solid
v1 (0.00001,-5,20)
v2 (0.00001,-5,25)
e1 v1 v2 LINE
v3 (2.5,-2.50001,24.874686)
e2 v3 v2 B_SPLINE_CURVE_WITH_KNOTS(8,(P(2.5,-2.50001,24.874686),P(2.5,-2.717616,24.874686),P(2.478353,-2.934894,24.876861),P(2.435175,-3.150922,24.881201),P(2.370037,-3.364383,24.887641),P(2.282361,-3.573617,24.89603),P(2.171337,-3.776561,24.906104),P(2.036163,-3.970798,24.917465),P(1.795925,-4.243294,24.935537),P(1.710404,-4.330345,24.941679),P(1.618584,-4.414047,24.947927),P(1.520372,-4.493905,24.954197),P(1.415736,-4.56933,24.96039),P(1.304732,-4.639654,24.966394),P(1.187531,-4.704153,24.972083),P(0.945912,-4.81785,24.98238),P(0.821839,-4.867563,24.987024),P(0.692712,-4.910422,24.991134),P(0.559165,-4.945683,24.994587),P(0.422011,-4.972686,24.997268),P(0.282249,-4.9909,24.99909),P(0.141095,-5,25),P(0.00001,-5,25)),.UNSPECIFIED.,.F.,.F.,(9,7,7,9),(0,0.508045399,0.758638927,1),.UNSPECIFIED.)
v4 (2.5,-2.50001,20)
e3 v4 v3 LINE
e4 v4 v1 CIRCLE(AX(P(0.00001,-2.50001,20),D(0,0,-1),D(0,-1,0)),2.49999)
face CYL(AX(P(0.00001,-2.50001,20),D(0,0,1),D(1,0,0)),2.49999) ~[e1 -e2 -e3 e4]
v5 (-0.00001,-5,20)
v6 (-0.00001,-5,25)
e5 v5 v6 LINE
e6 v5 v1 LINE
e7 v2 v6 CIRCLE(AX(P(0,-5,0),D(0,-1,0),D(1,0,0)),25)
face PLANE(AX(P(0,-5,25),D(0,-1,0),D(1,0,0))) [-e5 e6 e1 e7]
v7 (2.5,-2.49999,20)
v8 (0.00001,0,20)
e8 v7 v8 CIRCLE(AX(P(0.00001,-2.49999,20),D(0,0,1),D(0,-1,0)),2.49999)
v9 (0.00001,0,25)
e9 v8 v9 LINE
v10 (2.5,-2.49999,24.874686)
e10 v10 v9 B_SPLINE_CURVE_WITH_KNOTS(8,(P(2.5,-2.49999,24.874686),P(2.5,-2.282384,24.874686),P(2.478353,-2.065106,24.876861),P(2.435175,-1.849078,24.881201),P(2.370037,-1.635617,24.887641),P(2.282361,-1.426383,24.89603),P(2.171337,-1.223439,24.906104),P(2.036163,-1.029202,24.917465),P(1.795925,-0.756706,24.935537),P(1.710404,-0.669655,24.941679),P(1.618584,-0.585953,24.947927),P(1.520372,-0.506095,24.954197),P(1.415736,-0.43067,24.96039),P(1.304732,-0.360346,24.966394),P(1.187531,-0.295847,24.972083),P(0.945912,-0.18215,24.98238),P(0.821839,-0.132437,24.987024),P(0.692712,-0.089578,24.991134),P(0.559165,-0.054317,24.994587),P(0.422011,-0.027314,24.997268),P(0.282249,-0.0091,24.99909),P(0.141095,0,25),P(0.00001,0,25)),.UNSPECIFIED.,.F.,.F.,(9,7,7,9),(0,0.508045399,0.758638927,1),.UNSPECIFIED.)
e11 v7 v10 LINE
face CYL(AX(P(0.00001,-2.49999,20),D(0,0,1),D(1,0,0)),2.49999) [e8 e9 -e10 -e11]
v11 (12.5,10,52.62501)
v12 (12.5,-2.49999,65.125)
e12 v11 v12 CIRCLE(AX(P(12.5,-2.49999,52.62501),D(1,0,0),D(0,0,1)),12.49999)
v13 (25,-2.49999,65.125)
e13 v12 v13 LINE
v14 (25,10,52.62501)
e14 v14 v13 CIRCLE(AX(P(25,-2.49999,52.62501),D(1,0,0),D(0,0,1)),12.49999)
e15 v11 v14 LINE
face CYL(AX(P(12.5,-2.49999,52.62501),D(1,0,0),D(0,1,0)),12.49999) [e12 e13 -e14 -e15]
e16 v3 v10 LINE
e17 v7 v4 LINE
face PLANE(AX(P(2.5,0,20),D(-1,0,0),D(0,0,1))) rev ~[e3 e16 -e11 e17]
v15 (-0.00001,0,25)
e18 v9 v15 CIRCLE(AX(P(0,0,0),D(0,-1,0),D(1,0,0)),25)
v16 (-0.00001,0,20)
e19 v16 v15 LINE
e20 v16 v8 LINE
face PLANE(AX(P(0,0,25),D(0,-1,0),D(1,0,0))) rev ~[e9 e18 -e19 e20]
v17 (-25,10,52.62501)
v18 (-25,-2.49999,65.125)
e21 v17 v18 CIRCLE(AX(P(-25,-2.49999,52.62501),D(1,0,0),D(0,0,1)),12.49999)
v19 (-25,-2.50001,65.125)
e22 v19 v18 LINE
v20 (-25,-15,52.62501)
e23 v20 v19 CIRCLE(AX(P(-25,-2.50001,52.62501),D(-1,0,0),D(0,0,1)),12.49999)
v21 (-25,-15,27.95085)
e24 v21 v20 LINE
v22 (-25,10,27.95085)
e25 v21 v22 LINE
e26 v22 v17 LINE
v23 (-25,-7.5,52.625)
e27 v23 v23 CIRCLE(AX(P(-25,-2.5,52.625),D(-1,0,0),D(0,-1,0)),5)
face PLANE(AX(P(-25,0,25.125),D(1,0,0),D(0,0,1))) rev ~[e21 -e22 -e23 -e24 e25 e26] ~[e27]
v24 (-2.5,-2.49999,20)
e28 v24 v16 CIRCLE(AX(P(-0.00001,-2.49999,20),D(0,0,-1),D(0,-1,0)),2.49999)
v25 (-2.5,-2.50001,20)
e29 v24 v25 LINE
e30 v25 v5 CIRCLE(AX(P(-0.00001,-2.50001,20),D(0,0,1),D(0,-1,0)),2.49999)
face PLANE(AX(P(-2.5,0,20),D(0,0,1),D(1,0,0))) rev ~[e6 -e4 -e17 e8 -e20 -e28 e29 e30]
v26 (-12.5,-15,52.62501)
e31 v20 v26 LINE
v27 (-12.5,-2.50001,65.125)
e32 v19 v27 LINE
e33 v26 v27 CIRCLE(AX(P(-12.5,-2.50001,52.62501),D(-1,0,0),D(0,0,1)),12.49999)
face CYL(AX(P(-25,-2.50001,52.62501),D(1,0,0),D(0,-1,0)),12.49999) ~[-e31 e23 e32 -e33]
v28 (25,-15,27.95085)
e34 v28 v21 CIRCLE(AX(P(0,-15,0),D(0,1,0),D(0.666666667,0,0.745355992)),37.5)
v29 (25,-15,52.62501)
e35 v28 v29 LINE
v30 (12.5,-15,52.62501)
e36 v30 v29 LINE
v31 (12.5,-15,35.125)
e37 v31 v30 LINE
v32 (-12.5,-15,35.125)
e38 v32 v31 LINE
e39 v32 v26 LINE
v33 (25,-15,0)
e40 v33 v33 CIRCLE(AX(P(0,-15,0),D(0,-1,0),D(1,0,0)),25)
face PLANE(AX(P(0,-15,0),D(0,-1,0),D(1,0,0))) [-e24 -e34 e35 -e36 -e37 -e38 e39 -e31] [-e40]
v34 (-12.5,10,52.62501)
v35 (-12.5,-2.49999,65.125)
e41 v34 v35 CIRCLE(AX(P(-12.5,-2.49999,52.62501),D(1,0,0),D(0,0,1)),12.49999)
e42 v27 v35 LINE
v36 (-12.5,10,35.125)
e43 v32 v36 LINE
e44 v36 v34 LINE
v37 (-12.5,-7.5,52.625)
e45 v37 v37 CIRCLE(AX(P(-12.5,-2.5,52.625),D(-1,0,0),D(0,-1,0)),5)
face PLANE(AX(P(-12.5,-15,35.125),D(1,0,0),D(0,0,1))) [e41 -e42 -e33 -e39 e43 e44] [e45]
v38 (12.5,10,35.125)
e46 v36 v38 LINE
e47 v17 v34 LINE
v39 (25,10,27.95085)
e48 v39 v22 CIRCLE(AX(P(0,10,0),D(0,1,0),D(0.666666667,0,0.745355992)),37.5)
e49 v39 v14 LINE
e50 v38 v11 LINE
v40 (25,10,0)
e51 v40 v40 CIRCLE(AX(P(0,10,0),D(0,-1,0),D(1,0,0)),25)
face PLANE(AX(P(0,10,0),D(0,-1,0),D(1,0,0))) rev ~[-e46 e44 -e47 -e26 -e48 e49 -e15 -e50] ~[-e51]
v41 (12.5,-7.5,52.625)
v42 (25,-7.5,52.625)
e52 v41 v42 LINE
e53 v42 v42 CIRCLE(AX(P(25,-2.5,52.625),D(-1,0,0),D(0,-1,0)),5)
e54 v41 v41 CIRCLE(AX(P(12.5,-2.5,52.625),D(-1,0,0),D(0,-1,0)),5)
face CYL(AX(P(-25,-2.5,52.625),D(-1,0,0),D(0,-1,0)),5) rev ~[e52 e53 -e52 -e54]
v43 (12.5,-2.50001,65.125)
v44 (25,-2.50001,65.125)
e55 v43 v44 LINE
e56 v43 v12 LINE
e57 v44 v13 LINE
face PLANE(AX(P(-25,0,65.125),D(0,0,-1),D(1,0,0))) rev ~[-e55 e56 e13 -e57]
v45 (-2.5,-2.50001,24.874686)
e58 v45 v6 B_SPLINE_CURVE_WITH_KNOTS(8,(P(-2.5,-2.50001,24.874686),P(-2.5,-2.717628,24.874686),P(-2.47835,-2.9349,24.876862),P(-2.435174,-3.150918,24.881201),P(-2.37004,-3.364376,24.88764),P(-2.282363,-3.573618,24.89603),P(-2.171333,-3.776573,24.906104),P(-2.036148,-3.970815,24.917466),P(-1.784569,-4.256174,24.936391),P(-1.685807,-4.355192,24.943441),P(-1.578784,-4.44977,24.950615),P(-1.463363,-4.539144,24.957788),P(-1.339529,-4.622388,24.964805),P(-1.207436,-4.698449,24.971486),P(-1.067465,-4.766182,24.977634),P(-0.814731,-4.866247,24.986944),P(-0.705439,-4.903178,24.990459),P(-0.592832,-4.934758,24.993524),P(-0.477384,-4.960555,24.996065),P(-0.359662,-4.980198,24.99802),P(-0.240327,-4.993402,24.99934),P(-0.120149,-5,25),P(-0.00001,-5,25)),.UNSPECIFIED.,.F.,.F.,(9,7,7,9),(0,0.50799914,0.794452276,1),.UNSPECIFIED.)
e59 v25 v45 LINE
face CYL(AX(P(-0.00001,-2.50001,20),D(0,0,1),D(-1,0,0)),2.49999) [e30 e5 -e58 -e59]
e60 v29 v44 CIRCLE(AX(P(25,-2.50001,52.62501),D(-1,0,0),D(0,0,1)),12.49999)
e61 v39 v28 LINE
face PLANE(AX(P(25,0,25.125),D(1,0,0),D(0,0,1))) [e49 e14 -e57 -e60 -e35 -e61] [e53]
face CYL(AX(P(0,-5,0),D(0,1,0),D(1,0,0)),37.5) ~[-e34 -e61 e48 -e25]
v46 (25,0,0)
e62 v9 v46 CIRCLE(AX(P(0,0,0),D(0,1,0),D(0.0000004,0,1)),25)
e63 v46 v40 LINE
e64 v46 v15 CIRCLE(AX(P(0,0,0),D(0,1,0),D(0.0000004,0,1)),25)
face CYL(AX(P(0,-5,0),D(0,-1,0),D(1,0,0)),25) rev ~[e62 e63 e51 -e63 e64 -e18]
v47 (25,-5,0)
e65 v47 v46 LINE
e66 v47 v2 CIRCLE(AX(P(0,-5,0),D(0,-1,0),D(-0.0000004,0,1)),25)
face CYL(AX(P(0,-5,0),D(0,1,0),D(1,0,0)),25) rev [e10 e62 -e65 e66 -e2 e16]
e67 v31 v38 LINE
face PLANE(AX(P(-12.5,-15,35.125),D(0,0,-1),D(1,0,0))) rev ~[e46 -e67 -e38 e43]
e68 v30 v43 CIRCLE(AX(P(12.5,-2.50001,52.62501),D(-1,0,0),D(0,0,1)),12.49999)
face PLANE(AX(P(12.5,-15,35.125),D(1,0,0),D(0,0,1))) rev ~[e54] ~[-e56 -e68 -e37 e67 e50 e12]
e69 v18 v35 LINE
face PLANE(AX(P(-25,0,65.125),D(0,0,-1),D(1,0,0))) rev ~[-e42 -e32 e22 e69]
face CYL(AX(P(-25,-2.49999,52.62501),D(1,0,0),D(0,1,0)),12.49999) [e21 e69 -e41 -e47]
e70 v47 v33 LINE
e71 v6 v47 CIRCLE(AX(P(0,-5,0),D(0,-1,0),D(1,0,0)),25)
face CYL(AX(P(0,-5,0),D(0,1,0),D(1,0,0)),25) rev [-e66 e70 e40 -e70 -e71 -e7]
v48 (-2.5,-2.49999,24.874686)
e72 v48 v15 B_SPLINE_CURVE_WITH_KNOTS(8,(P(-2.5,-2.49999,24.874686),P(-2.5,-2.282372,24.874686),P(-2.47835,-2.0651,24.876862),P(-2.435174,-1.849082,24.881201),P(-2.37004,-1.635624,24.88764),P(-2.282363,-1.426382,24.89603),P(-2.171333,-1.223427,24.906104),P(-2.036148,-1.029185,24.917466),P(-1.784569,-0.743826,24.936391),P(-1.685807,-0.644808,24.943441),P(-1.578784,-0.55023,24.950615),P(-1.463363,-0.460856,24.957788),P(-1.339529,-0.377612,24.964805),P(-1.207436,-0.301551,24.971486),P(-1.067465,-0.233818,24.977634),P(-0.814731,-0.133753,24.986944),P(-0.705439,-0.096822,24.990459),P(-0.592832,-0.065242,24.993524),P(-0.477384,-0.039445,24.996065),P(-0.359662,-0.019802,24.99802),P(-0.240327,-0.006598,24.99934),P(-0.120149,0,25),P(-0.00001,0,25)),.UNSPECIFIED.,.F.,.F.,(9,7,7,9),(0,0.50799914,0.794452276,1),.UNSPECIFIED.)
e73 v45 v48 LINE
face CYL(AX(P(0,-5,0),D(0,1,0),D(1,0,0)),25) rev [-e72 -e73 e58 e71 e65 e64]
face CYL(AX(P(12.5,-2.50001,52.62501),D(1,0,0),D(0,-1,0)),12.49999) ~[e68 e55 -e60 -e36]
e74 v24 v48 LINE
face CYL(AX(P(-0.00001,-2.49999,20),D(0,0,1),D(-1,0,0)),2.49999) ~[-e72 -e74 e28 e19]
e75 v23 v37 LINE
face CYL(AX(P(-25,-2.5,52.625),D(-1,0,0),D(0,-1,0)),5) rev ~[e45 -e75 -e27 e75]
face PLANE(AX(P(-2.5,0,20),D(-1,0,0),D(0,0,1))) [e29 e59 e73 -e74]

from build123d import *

# Parameters (mm, degrees)
F0_R          = 37.5
F0_R_2        = 25
F1_DEPTH      = 5
F2_W          = 5
F2_H          = 10
F3_DEPTH      = 5
F4_R          = 2.49999
F5_R          = 37.5
F5_R_2        = 25
F6_DEPTH      = 10
F6_DEPTH_BACK = 15
F7_W          = 50
F7_H          = 40
F8_DEPTH      = 15
F8_DEPTH_BACK = 10
F9_W          = 25
F9_H          = 30
F10_DEPTH     = 25
F11_R         = 12.49999
F12_R         = 5
F13_DEPTH     = 62.501


# Not quite as in the source:
# - a fillet or chamfer is up to 0.001 mm smaller than in the source, because OpenCascade refuses the exact size


with BuildPart() as f1:
    # F0 (on Front) → F1 (new body)
    with BuildSketch(Plane.XZ):
        Circle(F0_R)
        Circle(F0_R_2, mode=Mode.SUBTRACT)
    extrude(amount=F1_DEPTH)

    # F2 (on Front) → F3 (join)
    with BuildSketch(Plane.XZ):
        with Locations((0, 25)):
            Rectangle(F2_W, F2_H)
    extrude(amount=F3_DEPTH)

    # F4 (radius 2.5 in the source; OpenCascade refuses exactly that, so slightly less here)
    f4_edges = [f1.edges().sort_by_distance(p)[0] for p in [
        (-2.5, -5, 22.437343),
        (2.5, -5, 22.437343),
        (-2.5, 0, 22.437343),
        (2.5, 0, 22.437343),
    ]]
    fillet(f4_edges, radius=F4_R)

    # F5 (on face) → F6 (join, two sides)
    with BuildSketch(Plane.XZ.offset(5)) as f6_sk:
        Circle(F5_R)
        Circle(F5_R_2, mode=Mode.SUBTRACT)
    extrude(amount=F6_DEPTH)
    extrude(f6_sk.sketch, amount=-F6_DEPTH_BACK)

    # F7 (on Front) → F8 (join, two sides)
    with BuildSketch(Plane.XZ) as f8_sk:
        with Locations((0, 45.1250001788)):
            Rectangle(F7_W, F7_H)
    extrude(amount=F8_DEPTH)
    extrude(f8_sk.sketch, amount=-F8_DEPTH_BACK)

    # F9 (on face) → F10 (cut)
    with BuildSketch(Plane.XZ.offset(15)):
        with Locations((0, 50.1250001788)):
            Rectangle(F9_W, F9_H)
    extrude(amount=-F10_DEPTH, mode=Mode.SUBTRACT)

    # F11 (radius 12.5 in the source; OpenCascade refuses exactly that, so slightly less here)
    f11_edges = [f1.edges().sort_by_distance(p)[0] for p in [
        (-18.75, 10, 65.125),
        (-18.75, -15, 65.125),
        (18.75, -15, 65.125),
        (18.75, 10, 65.125),
    ]]
    fillet(f11_edges, radius=F11_R)

    # F12 (on face) → F13 (cut, through all)
    with BuildSketch(Plane(origin=(-25, 0, 0), x_dir=(0, -1, 0), z_dir=(-1, 0, 0))):
        with Locations((2.5, 52.6250001788)):
            Circle(F12_R)
    extrude(amount=-F13_DEPTH, mode=Mode.SUBTRACT)


solid = f1.part
